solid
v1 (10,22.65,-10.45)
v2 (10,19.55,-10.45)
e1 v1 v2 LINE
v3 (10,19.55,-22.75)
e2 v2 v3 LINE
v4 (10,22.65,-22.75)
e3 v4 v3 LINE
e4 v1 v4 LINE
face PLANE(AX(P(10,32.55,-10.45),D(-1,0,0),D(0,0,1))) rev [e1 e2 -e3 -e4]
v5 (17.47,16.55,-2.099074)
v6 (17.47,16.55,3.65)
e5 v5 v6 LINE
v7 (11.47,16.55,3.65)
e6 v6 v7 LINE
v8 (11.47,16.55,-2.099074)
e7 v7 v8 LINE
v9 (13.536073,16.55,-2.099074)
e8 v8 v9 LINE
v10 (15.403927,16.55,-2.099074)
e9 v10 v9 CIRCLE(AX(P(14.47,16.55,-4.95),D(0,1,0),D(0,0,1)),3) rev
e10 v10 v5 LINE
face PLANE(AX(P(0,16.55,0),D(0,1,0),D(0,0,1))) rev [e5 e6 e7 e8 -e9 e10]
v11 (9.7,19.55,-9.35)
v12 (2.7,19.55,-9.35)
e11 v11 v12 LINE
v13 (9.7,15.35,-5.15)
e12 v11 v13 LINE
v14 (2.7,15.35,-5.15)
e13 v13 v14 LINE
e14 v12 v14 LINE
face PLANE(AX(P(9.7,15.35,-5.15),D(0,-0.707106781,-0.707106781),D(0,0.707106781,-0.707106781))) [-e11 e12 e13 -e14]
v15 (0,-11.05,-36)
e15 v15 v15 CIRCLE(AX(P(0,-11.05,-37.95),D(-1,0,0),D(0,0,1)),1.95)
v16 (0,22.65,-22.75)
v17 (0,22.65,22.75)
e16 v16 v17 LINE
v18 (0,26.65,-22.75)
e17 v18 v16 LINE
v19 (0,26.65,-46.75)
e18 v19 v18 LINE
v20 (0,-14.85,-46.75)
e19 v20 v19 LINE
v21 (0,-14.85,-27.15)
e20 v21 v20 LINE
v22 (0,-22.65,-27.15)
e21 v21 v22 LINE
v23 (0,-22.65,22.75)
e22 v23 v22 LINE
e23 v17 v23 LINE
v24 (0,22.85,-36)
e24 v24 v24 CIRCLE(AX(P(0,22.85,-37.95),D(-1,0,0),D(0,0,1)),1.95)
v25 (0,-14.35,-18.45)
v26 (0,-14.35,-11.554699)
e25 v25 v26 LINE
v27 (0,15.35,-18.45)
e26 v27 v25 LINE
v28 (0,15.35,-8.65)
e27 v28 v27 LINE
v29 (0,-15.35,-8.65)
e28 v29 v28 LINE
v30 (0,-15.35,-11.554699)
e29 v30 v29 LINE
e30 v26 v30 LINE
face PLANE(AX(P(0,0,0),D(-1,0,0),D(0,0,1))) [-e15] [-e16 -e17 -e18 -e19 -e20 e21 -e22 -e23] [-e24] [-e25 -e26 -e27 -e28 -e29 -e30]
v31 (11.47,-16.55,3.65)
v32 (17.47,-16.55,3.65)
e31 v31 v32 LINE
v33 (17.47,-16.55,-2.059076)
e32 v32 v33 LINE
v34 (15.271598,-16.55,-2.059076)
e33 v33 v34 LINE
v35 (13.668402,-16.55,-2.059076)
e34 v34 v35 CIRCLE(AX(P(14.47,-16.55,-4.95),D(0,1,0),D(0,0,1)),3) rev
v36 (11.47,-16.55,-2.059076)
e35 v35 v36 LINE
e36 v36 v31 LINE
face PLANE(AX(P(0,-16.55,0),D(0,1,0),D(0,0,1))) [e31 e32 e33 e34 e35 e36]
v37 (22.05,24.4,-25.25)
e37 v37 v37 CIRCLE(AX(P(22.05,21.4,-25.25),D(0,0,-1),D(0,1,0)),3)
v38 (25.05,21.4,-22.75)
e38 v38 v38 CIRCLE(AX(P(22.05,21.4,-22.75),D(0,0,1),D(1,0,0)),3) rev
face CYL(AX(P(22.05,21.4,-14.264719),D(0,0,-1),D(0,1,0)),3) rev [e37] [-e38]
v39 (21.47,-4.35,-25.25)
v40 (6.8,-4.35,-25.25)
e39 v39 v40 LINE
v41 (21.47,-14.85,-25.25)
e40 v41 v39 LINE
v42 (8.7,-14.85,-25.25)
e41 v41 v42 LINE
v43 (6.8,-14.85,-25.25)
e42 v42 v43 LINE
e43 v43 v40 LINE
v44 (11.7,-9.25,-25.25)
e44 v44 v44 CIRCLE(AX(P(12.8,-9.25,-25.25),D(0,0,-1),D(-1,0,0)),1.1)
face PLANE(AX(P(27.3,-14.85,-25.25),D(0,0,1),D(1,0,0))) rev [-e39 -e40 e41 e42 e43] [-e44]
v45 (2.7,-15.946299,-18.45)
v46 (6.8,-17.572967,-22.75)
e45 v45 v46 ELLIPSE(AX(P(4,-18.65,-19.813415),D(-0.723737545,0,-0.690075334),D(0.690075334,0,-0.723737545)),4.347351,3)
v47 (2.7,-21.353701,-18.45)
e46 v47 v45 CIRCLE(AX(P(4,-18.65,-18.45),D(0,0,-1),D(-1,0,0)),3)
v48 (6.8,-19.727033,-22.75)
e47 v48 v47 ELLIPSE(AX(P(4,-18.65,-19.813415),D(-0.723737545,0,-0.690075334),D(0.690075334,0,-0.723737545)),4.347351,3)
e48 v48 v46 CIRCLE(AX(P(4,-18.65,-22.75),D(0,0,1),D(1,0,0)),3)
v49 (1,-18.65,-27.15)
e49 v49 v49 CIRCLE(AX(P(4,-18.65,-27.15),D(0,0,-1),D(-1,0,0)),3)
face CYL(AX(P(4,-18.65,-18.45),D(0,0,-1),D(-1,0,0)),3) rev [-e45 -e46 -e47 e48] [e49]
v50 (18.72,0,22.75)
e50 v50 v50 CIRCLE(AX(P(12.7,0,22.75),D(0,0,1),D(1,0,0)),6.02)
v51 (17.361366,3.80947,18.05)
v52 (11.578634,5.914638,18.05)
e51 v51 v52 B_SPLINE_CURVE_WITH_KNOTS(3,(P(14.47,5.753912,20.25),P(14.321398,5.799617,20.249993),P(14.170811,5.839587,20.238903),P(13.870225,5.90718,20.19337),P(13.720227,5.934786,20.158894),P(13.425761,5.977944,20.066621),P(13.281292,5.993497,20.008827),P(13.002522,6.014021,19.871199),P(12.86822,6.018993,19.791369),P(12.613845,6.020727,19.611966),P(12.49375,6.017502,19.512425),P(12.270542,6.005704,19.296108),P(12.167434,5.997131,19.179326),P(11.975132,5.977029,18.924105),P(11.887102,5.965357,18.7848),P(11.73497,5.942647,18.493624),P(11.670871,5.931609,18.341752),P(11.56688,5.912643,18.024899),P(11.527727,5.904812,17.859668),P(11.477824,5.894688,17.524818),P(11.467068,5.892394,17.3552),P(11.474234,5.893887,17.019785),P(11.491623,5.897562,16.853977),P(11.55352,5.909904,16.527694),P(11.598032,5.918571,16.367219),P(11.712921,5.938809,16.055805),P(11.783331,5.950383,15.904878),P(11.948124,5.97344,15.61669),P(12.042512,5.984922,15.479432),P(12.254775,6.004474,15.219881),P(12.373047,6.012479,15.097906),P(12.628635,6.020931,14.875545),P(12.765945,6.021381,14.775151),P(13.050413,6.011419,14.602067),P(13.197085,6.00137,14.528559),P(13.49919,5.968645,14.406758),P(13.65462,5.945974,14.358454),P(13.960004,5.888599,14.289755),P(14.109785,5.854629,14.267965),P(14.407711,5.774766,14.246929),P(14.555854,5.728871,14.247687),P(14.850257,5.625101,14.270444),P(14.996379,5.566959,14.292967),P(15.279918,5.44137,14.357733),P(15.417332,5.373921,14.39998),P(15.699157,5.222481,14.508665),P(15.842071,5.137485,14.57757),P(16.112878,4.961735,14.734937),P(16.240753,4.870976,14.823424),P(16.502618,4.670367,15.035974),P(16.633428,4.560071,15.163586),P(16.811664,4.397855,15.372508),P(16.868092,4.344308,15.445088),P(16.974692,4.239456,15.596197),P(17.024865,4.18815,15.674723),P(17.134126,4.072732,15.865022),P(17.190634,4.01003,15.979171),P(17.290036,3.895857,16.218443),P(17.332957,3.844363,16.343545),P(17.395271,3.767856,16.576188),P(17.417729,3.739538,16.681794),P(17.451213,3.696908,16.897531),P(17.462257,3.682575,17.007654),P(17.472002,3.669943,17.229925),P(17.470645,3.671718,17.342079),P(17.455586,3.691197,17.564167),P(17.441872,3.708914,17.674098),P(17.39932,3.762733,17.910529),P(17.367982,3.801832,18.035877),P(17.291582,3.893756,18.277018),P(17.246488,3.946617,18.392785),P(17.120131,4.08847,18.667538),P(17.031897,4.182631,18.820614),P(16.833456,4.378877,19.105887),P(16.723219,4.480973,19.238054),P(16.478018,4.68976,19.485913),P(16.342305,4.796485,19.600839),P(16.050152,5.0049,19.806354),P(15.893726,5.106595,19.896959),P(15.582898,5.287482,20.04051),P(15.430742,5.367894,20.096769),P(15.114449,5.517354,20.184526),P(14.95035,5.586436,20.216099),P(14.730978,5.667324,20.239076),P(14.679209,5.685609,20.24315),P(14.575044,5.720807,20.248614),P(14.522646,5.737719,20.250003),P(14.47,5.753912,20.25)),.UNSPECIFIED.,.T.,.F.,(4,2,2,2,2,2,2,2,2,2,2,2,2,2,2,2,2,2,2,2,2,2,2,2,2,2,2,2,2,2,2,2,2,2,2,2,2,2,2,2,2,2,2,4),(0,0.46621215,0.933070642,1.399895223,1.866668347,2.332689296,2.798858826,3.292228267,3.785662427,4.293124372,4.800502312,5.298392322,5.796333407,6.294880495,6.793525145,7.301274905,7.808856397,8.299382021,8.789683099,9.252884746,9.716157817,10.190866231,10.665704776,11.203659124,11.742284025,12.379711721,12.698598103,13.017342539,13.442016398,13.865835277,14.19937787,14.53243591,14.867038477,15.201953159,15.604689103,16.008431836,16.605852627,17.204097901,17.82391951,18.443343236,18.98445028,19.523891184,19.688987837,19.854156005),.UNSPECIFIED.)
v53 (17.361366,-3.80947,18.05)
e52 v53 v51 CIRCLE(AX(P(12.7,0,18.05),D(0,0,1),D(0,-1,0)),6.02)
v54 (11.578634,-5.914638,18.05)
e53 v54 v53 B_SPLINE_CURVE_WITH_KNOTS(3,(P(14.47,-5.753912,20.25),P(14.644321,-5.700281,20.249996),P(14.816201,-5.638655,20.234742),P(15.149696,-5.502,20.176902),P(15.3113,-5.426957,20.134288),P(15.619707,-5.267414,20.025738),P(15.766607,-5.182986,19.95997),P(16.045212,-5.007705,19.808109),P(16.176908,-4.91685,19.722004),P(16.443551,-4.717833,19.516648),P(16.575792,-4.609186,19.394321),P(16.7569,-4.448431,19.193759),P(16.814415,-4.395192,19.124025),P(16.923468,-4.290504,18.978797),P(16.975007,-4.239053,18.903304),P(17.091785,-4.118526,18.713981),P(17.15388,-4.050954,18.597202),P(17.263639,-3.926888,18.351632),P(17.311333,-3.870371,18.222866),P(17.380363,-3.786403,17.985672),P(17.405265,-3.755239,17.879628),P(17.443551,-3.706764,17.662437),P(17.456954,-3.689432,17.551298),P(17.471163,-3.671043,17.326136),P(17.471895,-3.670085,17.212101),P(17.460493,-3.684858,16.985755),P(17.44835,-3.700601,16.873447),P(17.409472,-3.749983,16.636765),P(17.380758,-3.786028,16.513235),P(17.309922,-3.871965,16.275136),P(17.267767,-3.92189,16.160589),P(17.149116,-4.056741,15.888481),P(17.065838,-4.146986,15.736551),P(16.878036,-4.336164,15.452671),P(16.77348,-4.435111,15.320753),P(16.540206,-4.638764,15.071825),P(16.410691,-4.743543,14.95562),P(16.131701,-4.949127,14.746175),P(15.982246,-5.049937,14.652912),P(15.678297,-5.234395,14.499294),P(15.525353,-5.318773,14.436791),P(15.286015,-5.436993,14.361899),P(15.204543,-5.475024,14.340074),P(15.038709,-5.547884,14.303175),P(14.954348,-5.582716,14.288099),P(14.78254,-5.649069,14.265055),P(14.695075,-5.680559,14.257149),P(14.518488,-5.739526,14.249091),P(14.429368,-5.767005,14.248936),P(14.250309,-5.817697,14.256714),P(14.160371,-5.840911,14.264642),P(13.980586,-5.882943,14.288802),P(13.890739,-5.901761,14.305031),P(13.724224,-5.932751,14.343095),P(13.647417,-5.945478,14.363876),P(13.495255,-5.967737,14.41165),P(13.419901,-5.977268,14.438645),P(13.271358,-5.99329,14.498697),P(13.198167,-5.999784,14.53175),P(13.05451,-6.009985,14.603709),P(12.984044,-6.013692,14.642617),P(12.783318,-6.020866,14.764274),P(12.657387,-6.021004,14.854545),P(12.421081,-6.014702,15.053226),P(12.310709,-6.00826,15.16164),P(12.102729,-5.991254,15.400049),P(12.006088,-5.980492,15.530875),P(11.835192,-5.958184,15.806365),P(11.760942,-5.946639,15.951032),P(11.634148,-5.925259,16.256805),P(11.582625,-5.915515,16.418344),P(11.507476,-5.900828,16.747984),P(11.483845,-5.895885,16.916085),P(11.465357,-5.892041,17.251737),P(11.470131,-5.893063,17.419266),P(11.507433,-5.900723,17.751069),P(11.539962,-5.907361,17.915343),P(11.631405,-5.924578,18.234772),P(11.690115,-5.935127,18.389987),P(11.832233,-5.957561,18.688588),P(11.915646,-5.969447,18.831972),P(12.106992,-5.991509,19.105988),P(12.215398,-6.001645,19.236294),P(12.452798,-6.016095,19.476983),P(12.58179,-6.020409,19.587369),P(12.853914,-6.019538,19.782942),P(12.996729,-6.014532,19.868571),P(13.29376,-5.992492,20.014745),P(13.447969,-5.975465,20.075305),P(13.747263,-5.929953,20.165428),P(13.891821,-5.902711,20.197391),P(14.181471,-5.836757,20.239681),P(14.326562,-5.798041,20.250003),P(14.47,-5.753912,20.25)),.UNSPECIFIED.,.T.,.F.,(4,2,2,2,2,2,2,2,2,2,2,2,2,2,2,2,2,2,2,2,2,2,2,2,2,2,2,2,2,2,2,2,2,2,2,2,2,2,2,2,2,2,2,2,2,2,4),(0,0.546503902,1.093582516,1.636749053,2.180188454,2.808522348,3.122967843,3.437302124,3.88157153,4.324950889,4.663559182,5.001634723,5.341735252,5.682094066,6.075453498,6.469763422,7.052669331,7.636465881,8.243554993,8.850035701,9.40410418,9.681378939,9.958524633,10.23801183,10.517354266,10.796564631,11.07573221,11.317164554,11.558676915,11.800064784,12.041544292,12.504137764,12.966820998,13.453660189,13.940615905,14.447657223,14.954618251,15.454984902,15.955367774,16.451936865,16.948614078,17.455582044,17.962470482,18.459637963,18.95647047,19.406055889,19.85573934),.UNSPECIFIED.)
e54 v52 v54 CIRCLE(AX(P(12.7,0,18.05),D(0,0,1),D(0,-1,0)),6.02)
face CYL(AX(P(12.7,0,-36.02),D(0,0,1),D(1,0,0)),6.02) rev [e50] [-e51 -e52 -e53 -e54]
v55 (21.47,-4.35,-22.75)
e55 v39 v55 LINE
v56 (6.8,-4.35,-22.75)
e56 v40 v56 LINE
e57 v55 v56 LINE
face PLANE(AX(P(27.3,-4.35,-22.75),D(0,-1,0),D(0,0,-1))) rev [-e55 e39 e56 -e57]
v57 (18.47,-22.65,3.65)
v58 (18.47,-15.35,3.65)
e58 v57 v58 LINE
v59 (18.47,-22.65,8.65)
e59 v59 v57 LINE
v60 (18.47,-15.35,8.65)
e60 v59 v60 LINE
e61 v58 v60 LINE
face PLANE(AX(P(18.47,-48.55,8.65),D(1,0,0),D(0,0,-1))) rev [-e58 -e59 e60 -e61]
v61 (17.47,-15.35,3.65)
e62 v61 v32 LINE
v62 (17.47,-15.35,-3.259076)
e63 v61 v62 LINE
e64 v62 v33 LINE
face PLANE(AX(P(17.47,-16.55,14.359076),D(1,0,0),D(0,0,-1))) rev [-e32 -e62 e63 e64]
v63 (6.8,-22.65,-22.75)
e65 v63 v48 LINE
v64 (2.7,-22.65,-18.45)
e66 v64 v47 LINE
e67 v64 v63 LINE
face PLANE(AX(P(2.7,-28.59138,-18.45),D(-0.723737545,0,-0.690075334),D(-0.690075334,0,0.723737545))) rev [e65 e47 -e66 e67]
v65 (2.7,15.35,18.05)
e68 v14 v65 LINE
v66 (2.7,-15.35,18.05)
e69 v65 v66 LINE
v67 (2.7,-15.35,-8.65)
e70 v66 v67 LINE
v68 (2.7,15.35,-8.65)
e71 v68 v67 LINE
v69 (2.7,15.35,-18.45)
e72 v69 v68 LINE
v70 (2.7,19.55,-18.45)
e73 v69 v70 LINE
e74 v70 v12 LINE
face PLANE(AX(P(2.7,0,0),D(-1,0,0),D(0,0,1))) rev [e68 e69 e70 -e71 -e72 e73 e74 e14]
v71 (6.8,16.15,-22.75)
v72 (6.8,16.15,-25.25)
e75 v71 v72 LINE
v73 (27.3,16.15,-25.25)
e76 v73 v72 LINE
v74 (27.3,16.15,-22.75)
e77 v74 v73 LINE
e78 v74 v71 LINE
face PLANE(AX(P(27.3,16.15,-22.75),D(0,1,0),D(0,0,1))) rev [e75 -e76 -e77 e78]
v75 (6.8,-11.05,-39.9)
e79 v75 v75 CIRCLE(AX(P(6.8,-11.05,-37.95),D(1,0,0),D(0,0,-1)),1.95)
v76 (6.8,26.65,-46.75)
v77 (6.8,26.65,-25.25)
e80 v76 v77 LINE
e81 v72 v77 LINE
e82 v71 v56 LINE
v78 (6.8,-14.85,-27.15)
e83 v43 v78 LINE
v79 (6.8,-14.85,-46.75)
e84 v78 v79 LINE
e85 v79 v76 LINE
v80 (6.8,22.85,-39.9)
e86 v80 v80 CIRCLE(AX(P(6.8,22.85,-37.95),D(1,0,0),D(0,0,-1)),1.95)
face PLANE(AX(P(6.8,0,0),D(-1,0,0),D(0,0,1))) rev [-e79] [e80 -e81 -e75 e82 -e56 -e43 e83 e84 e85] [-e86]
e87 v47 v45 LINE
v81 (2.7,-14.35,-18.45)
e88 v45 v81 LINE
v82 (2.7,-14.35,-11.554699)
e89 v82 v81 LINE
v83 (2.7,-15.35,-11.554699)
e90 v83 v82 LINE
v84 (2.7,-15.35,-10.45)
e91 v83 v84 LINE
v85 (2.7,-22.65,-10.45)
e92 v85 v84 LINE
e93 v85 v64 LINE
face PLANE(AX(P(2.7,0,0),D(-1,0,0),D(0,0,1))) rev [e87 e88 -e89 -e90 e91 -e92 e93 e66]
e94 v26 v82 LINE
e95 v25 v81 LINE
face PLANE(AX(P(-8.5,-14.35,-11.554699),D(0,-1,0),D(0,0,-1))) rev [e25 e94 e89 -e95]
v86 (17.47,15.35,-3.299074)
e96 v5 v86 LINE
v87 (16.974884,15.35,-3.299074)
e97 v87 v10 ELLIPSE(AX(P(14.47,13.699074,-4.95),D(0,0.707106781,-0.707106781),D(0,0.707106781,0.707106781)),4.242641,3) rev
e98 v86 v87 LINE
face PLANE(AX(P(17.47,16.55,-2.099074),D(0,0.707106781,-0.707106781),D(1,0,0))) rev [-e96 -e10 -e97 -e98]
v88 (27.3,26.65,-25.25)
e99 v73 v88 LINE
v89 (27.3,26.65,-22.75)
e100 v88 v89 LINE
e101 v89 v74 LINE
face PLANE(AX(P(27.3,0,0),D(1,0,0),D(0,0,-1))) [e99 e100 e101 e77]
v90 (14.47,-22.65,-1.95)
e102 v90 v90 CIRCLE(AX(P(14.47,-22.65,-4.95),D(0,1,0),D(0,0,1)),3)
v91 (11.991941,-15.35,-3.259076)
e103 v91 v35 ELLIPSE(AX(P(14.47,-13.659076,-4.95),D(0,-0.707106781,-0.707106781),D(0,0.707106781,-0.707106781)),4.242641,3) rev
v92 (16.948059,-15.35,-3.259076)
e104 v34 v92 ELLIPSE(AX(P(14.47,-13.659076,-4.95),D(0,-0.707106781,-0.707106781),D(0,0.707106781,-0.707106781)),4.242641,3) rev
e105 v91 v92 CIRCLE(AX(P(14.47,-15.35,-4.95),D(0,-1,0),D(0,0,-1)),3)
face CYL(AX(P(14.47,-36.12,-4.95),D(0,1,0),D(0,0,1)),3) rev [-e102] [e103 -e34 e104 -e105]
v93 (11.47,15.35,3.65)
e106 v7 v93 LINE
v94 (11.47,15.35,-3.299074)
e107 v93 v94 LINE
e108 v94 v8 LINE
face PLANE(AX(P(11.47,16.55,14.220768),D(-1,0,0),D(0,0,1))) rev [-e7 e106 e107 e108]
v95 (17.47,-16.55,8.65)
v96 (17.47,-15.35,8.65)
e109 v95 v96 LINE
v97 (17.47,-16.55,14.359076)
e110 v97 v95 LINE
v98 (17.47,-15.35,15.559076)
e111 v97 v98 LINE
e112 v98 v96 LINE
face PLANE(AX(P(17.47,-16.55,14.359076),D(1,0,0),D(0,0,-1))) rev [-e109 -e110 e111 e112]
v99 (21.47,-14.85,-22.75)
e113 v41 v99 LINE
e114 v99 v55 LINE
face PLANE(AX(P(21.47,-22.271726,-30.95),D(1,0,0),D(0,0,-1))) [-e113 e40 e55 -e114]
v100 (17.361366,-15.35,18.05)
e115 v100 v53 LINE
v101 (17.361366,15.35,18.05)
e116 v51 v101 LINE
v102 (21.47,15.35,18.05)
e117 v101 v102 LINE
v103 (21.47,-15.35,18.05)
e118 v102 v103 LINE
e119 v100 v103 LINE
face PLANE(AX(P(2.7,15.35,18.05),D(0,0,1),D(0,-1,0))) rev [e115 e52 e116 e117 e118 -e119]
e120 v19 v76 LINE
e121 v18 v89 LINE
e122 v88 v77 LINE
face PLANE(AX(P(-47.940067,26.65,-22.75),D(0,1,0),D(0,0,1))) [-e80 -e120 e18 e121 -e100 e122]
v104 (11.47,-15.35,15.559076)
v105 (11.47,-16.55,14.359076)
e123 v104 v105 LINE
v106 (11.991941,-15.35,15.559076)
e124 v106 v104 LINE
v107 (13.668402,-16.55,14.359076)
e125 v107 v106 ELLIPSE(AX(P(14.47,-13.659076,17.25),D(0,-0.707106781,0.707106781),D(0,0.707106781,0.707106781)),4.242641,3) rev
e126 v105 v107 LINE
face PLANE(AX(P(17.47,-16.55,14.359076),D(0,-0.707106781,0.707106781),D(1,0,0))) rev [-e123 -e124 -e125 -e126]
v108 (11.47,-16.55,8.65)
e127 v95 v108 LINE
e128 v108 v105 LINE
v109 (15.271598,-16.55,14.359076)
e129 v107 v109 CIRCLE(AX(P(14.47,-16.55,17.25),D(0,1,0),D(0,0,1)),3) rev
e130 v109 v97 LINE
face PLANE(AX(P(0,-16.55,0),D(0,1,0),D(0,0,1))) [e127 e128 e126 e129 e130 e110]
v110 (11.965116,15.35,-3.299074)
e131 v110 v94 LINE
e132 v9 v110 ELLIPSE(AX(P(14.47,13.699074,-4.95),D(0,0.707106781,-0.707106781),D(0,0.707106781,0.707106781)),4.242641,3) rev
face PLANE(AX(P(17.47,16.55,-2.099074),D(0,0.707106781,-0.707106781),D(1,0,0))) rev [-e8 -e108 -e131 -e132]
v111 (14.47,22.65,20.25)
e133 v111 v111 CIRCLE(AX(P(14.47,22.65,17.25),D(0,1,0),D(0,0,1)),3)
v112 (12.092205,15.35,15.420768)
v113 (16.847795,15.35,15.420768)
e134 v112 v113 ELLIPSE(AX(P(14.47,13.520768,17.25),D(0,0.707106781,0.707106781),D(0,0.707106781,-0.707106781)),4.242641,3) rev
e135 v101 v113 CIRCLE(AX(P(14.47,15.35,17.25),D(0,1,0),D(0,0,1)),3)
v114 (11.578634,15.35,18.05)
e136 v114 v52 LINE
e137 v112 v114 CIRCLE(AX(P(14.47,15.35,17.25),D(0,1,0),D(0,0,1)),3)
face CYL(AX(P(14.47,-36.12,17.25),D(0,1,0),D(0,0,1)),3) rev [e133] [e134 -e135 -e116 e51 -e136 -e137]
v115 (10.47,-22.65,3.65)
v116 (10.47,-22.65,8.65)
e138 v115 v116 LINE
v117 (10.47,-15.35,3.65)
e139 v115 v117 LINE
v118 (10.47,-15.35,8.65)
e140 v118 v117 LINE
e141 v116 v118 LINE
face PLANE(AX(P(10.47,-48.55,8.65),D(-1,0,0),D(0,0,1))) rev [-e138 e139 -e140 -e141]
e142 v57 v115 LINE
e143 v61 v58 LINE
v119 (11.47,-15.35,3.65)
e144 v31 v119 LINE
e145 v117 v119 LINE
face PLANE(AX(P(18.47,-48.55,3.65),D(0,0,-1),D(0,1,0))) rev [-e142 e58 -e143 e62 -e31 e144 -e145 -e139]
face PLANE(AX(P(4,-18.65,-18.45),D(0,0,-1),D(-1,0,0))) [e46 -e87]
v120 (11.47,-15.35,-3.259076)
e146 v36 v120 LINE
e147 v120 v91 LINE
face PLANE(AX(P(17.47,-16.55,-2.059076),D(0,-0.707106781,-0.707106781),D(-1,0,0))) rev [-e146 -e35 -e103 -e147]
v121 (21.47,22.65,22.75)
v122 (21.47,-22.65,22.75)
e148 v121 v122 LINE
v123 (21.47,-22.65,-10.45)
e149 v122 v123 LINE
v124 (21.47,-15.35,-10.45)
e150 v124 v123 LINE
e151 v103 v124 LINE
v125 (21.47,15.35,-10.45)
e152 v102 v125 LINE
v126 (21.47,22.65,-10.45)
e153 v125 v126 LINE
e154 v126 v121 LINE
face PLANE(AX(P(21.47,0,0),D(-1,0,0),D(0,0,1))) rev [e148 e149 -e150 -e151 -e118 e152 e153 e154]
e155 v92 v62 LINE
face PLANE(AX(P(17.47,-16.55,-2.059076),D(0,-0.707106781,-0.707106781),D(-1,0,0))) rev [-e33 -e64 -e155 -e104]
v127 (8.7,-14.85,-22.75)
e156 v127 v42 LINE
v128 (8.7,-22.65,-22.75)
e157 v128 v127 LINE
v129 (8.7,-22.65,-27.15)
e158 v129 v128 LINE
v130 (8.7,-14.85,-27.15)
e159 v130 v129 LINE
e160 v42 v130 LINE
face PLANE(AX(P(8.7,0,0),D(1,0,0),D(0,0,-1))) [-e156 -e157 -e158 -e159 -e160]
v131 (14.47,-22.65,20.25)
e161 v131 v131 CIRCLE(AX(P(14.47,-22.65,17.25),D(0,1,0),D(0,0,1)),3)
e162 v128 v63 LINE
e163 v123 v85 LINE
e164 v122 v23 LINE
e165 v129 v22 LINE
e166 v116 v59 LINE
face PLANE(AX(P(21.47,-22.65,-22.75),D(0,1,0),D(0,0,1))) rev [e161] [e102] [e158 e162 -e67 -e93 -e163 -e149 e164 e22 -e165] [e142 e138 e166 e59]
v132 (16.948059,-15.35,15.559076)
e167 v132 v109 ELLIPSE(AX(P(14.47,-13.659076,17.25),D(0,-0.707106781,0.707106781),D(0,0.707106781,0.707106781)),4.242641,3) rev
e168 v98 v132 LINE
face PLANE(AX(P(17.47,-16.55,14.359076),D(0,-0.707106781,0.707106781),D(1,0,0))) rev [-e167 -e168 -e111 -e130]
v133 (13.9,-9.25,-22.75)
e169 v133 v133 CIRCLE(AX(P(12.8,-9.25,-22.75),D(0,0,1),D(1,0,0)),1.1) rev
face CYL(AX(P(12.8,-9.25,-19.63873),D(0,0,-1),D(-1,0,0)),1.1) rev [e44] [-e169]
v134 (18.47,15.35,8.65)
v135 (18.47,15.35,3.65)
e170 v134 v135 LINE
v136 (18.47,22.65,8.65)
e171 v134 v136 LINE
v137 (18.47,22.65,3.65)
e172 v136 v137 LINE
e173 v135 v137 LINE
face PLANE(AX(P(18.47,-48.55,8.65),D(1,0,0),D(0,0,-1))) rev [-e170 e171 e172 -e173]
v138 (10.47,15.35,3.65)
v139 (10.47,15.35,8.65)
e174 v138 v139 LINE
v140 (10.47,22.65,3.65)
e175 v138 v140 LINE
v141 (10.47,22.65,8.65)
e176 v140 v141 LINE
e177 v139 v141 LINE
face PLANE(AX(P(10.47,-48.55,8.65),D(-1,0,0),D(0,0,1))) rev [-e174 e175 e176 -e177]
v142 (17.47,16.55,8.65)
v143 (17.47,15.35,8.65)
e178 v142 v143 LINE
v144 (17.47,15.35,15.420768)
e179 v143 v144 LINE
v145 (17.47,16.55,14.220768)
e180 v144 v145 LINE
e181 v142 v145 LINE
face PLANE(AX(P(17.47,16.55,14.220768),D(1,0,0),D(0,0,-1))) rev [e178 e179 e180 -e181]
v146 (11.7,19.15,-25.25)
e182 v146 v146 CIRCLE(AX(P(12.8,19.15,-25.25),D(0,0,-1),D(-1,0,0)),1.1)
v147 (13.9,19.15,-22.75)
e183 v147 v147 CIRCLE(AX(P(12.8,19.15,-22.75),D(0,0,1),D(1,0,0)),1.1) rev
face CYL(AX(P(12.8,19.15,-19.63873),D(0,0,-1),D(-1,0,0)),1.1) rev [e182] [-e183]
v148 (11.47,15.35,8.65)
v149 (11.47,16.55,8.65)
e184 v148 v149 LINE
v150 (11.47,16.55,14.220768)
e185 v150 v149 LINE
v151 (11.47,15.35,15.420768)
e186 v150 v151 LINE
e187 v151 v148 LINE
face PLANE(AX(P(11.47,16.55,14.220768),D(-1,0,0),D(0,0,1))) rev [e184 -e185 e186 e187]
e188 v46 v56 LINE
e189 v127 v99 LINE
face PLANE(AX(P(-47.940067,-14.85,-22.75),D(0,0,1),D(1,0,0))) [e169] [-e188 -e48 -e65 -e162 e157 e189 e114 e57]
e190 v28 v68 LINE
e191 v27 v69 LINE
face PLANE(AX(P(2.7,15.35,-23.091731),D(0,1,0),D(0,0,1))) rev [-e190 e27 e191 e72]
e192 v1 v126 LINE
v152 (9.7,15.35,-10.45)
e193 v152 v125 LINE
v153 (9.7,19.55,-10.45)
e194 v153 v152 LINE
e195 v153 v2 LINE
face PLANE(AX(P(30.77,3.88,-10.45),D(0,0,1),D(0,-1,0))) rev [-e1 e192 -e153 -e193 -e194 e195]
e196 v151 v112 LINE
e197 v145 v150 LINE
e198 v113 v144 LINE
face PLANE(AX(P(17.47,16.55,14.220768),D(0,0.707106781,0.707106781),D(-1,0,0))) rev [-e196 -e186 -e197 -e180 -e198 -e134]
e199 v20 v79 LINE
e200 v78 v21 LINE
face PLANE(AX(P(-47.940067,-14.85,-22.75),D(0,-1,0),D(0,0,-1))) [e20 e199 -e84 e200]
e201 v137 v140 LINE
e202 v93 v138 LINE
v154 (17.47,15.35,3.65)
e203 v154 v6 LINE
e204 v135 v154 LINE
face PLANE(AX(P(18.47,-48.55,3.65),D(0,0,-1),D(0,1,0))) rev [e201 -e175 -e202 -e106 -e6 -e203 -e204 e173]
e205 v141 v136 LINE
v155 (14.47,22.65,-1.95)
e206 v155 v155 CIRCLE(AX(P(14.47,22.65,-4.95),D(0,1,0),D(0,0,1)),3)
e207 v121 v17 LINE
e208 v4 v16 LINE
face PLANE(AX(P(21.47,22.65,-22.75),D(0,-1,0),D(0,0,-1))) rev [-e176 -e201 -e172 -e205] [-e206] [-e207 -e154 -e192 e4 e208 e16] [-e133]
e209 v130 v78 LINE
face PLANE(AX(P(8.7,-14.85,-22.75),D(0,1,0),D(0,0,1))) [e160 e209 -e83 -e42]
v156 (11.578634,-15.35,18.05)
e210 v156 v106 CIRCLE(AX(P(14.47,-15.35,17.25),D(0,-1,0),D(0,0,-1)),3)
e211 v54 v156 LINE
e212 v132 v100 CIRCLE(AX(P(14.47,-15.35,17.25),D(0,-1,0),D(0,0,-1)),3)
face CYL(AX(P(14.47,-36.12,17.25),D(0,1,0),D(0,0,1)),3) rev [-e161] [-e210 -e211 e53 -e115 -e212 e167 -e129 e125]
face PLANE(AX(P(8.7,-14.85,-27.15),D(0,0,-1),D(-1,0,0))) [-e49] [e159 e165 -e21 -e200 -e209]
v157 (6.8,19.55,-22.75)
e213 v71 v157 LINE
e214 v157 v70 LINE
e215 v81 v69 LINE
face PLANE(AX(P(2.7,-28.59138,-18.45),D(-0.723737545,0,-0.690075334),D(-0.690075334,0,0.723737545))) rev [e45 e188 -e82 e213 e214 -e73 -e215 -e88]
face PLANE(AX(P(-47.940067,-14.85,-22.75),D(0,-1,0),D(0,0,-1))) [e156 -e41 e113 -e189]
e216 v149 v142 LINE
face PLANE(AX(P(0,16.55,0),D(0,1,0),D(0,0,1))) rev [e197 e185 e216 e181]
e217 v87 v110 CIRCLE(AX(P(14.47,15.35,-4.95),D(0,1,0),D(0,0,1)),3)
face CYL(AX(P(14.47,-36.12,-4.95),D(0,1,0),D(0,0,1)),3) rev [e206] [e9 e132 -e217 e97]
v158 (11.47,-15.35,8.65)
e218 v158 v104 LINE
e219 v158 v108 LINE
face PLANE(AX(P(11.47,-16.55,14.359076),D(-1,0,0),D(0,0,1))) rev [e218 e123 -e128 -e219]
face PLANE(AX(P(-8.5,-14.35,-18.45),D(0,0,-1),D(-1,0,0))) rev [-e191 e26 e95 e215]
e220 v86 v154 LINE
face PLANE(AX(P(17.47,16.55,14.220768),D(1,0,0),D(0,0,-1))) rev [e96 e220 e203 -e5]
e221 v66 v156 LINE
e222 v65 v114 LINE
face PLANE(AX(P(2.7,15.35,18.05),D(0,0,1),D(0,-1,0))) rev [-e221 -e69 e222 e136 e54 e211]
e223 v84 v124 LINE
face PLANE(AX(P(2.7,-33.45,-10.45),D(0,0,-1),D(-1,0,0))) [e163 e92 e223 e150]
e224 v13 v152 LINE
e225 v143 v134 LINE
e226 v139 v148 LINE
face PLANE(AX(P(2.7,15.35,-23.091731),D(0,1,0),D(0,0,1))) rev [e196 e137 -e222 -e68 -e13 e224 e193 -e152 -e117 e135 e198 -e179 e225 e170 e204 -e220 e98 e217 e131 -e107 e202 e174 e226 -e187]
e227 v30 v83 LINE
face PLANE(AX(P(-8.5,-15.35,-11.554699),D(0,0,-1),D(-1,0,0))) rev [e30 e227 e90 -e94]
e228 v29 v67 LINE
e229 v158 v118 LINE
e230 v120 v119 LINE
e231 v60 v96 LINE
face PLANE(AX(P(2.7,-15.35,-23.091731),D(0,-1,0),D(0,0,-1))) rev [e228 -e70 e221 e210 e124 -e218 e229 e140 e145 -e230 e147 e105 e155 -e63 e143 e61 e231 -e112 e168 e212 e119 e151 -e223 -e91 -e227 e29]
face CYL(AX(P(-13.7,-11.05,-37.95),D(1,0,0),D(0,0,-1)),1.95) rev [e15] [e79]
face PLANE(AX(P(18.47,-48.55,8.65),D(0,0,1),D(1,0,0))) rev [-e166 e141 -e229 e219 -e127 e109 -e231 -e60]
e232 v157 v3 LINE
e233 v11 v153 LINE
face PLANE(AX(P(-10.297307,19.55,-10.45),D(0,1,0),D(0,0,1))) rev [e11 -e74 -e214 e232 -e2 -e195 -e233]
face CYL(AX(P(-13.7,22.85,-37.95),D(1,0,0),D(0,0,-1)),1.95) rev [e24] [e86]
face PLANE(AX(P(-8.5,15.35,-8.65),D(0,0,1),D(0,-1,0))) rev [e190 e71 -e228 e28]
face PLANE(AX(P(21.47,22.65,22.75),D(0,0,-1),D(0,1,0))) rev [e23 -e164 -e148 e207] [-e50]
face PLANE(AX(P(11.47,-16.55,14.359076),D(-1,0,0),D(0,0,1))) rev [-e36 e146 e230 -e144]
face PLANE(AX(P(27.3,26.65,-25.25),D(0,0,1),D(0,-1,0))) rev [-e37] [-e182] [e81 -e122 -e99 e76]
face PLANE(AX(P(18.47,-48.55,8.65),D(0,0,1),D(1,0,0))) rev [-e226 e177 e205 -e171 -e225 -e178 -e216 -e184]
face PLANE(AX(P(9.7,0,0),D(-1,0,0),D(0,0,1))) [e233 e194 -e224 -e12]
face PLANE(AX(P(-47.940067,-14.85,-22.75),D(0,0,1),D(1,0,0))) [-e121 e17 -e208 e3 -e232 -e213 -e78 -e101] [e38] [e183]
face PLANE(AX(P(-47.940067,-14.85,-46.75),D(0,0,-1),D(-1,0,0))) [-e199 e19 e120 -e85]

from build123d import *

# Parameters (mm, degrees)
CROQUIS4_W              = 45.5
CROQUIS4_H              = 45.3
SALIENTE_EXTRUIR3_DEPTH = 21.47
CROQUIS5_W              = 41.141731218
CROQUIS5_H              = 30.7
CORTAR_EXTRUIR2_DEPTH   = 18.77
CROQUIS6_W              = 18.6
CROQUIS6_H              = 24.6
CORTAR_EXTRUIR3_DEPTH   = 18.77
CROQUIS7_R              = 3
CORTAR_EXTRUIR4_DEPTH   = 58.77
CROQUIS8_R              = 6.02
CORTAR_EXTRUIR5_DEPTH   = 58.77
CROQUIS9_W              = 6
CROQUIS9_H              = 16.319841708
CORTAR_EXTRUIR7_DEPTH   = 1.2
CHAFL_N1_SIZE           = 1.2
CROQUIS10_W             = 8
CROQUIS10_H             = 5
CORTAR_EXTRUIR8_DEPTH   = 71.2
CROQUIS11_W             = 6
CROQUIS11_H             = 16.418152186
CORTAR_EXTRUIR9_DEPTH   = 1.2
CHAFL_N2_SIZE           = 1.2
CORTAR_EXTRUIR12_DEPTH  = 11.2
CORTAR_EXTRUIR14_DEPTH  = 7
CROQUIS15_W             = 12.3
CROQUIS15_H             = 4.2
CORTAR_EXTRUIR15_DEPTH  = 9.47
CROQUIS16_W             = 7
CROQUIS16_H             = 5
CORTAR_EXTRUIR17_DEPTH  = 0.3
CROQUIS17_W             = 7
CROQUIS17_H             = 0.8
SALIENTE_EXTRUIR4_DEPTH = 3
CROQUIS18_W             = 21.819351721
CROQUIS18_H             = 12.3
CORTAR_EXTRUIR18_DEPTH  = 53
SALIENTE_EXTRUIR5_START = -2.7
CROQUIS19_W             = 24
CROQUIS19_H             = 41.5
SALIENTE_EXTRUIR5_DEPTH = 6.8
CROQUIS21_W             = 2.5
CROQUIS21_H             = 10.5
SALIENTE_EXTRUIR6_DEPTH = 20.5
CROQUIS22_R             = 1.95
CORTAR_EXTRUIR19_DEPTH  = 20.5
CROQUIS23_W             = 9.795322327
CROQUIS23_H             = 20.802243728
CORTAR_EXTRUIR20_DEPTH  = 20.5
CROQUIS24_R             = 1.1
CORTAR_EXTRUIR22_DEPTH  = 2.5
CROQUIS25_W             = 2.17
CROQUIS25_H             = 12.3
CORTAR_EXTRUIR23_DEPTH  = 13
CROQUIS26_R             = 3
CORTAR_EXTRUIR24_DEPTH  = 2.5
SALIENTE_EXTRUIR7_REACH = 70.642
CROQUIS31_W             = 4.4
CROQUIS31_H             = 7.8
SALIENTE_EXTRUIR8_DEPTH = 8.7
CROQUIS32_R             = 3
CORTAR_EXTRUIR25_DEPTH  = 8.7


# Some blends are built 0.0001 mm under size
with BuildPart() as part:
    # Croquis4 → Saliente-Extruir3 (new body)
    with BuildSketch(Plane(origin=(0, 0, 0), x_dir=(0, 0, -1), z_dir=(1, 0, 0))):
        Rectangle(CROQUIS4_W, CROQUIS4_H)
    extrude(amount=SALIENTE_EXTRUIR3_DEPTH)

    # Croquis5 → Cortar-Extruir2 (cut)
    with BuildSketch(Plane(origin=(21.47, 0, 0), x_dir=(0, 0, -1), z_dir=(1, 0, 0))):
        with Locations((2.520865609, 0)):
            Rectangle(CROQUIS5_W, CROQUIS5_H)
    extrude(amount=-CORTAR_EXTRUIR2_DEPTH, mode=Mode.SUBTRACT)

    # Croquis6 → Cortar-Extruir3 (cut)
    with BuildSketch(Plane(origin=(0, 22.65, 0), x_dir=(1, 0, 0), z_dir=(0, 1, 0))):
        with Locations((21.47, 22.75)):
            Rectangle(CROQUIS6_W, CROQUIS6_H)
    extrude(amount=-CORTAR_EXTRUIR3_DEPTH, mode=Mode.SUBTRACT)

    # Croquis7 → Cortar-Extruir4 (cut)
    with BuildSketch(Plane(origin=(0, 22.65, 0), x_dir=(1, 0, 0), z_dir=(0, 1, 0))):
        with Locations(Location((14.47, -17.25, 0), (0, 0, 270))):
            Circle(CROQUIS7_R)
        with Locations(Location((14.47, 4.95, 0), (0, 0, 270))):
            Circle(CROQUIS7_R)
    extrude(amount=-CORTAR_EXTRUIR4_DEPTH, mode=Mode.SUBTRACT)

    # Croquis8 → Cortar-Extruir5 (cut)
    with BuildSketch(Plane.XY.offset(22.75)):
        with Locations((12.7, 0)):
            Circle(CROQUIS8_R)
    extrude(amount=-CORTAR_EXTRUIR5_DEPTH, mode=Mode.SUBTRACT)

    # Croquis9 → Cortar-Extruir7 (cut)
    with BuildSketch(Plane.XZ.offset(-15.35)):
        with Locations((14.47, 6.060847086)):
            Rectangle(CROQUIS9_W, CROQUIS9_H)
    extrude(amount=-CORTAR_EXTRUIR7_DEPTH, mode=Mode.SUBTRACT)

    # Chaflán1
    # the kernel refuses this chamfer: 1.2 mm, written as the material it takes off along each edge
    with BuildSketch(Plane(origin=(12.317907402, 15.35, -2.099073768), x_dir=(0, -0.027495876610584495, -0.9996219169112968), z_dir=(1, 0, 0)), Plane(origin=(11.47, 15.35, -2.099073768), x_dir=(0, -0.027495876610584533, -0.9996219169112968), z_dir=(1, 0, 0))) as chafl_n1_piece_1:
        Polygon((CHAFL_N1_SIZE * 0.999621916911, CHAFL_N1_SIZE * 0.0274958766106), (-CHAFL_N1_SIZE * 0.0274958766106, CHAFL_N1_SIZE * 0.999621916911), (0, 0), align=None)
    extrude(amount=5.152092598, mode=Mode.SUBTRACT)
    with BuildSketch(Plane(origin=(17.47, 15.35, 14.22076794), x_dir=(0, -0.027495876610585984, 0.9996219169112968), z_dir=(-1, 0, 0))) as chafl_n1_piece_2_section:
        Polygon((CHAFL_N1_SIZE * 0.999621916911, CHAFL_N1_SIZE * 0.0274958766106), (-CHAFL_N1_SIZE * 0.0274958766106, CHAFL_N1_SIZE * 0.999621916911), (0, 0), align=None)
    chafl_n1_piece_2 = extrude(amount=6, mode=Mode.PRIVATE)
    chafl_n1_piece_2 = split(chafl_n1_piece_2, bisect_by=Plane(origin=(14.47, 16.55, 14.617252925), z_dir=(0, -1, 0)), keep=Keep.TOP, mode=Mode.PRIVATE)
    add(chafl_n1_piece_2, mode=Mode.SUBTRACT)

    # Croquis10 → Cortar-Extruir8 (cut)
    with BuildSketch(Plane(origin=(0, 22.65, 0), x_dir=(1, 0, 0), z_dir=(0, 1, 0))):
        with Locations((14.47, -6.15)):
            Rectangle(CROQUIS10_W, CROQUIS10_H)
    extrude(amount=-CORTAR_EXTRUIR8_DEPTH, mode=Mode.SUBTRACT)

    # Croquis11 → Cortar-Extruir9 (cut)
    with BuildSketch(Plane(origin=(0, -15.35, 0), x_dir=(1, 0, 0), z_dir=(0, 1, 0))):
        with Locations((14.47, -6.15)):
            Rectangle(CROQUIS11_W, CROQUIS11_H)
    extrude(amount=-CORTAR_EXTRUIR9_DEPTH, mode=Mode.SUBTRACT)

    # Chaflán2
    chafl_n2_edges = [part.edges().sort_by_distance(p)[0] for p in [
        (12.569201122, -15.35, -2.059076093),
        (16.370798878, -15.35, -2.059076093),
        (12.569201122, -15.35, 14.359076093),
        (16.370798878, -15.35, 14.359076093),
    ]]
    chamfer(chafl_n2_edges, length=CHAFL_N2_SIZE - 0.0001)  # a hair under: the kernel refuses the full size

    # Croquis12 → Cortar-Extruir12 (cut)
    with BuildSketch(Plane(origin=(2.7, 0, 0), x_dir=(0, 0, -1), z_dir=(1, 0, 0))):
        Polygon((8.65, 15.35), (8.65, -15.35), (11.55469898, -15.35), (11.55469898, -14.35), (18.45, -14.35), (18.45, 15.35), align=None)
    extrude(amount=-CORTAR_EXTRUIR12_DEPTH, mode=Mode.SUBTRACT)

    # Croquis14 → Cortar-Extruir14 (cut)
    with BuildSketch(Plane(origin=(2.7, 0, 0), x_dir=(0, 0, -1), z_dir=(1, 0, 0))):
        Polygon((10.15, 15.35), (5.15, 15.35), (10.15, 20.35), align=None)
    extrude(amount=CORTAR_EXTRUIR14_DEPTH, mode=Mode.SUBTRACT)

    # Croquis15 → Cortar-Extruir15 (cut)
    with BuildSketch(Plane(origin=(12.17, 0, 0), x_dir=(0, 0, -1), z_dir=(1, 0, 0))):
        with Locations((16.6, 17.45)):
            Rectangle(CROQUIS15_W, CROQUIS15_H)
    extrude(amount=-CORTAR_EXTRUIR15_DEPTH, mode=Mode.SUBTRACT)

    # Croquis16 → Cortar-Extruir17 (cut)
    with BuildSketch(Plane.XY.offset(-10.15)):
        with Locations((6.2, 17.85)):
            Rectangle(CROQUIS16_W, CROQUIS16_H)
    extrude(amount=-CORTAR_EXTRUIR17_DEPTH, mode=Mode.SUBTRACT)

    # Croquis17 → Saliente-Extruir4 (add)
    with BuildSketch(Plane(origin=(0, 0, -10.45), x_dir=(-1, 0, 0), z_dir=(0, 0, -1))):
        with Locations((-6.2, 19.95)):
            Rectangle(CROQUIS17_W, CROQUIS17_H)
    extrude(amount=-SALIENTE_EXTRUIR4_DEPTH)

    # Croquis18 → Cortar-Extruir18 (cut)
    with BuildSketch(Plane.XZ.offset(-19.55)):
        with Locations((13.609675861, -16.6)):
            Rectangle(CROQUIS18_W, CROQUIS18_H)
    extrude(amount=CORTAR_EXTRUIR18_DEPTH, mode=Mode.SUBTRACT)

    # Croquis19 → Saliente-Extruir5 (add)
    with BuildSketch(Plane(origin=(2.7, 0, 0), x_dir=(0, 0, -1), z_dir=(1, 0, 0)).offset(SALIENTE_EXTRUIR5_START)):
        with Locations((34.75, 5.9)):
            Rectangle(CROQUIS19_W, CROQUIS19_H)
    extrude(amount=SALIENTE_EXTRUIR5_DEPTH)

    # Croquis21 → Saliente-Extruir6 (add)
    with BuildSketch(Plane(origin=(6.8, 0, 0), x_dir=(0, 0, -1), z_dir=(1, 0, 0))):
        with Locations((24, 21.4)):
            Rectangle(CROQUIS21_W, CROQUIS21_H)
        with Locations((24, -9.6)):
            Rectangle(CROQUIS21_W, CROQUIS21_H)
    extrude(amount=SALIENTE_EXTRUIR6_DEPTH)

    # Croquis22 → Cortar-Extruir19 (cut)
    with BuildSketch(Plane(origin=(6.8, 0, 0), x_dir=(0, 0, -1), z_dir=(1, 0, 0))):
        with Locations((37.95, 22.85)):
            Circle(CROQUIS22_R)
        with Locations((37.95, -11.05)):
            Circle(CROQUIS22_R)
    extrude(amount=-CORTAR_EXTRUIR19_DEPTH, mode=Mode.SUBTRACT)

    # Croquis23 → Cortar-Extruir20 (cut)
    with BuildSketch(Plane(origin=(0, 0, -10.45), x_dir=(-1, 0, 0), z_dir=(0, 0, -1))):
        with Locations((-26.367661164, -11.870604275)):
            Rectangle(CROQUIS23_W, CROQUIS23_H)
    extrude(amount=CORTAR_EXTRUIR20_DEPTH, mode=Mode.SUBTRACT)

    # Croquis24 → Cortar-Extruir22 (cut)
    with BuildSketch(Plane(origin=(0, 0, -25.25), x_dir=(-1, 0, 0), z_dir=(0, 0, -1))):
        with Locations((-12.8, -9.25)):
            Circle(CROQUIS24_R)
        with Locations((-12.8, 19.15)):
            Circle(CROQUIS24_R)
    extrude(amount=-CORTAR_EXTRUIR22_DEPTH, mode=Mode.SUBTRACT)

    # Croquis25 → Cortar-Extruir23 (cut)
    with BuildSketch(Plane.XZ.offset(-19.55)):
        with Locations((11.085, -16.6)):
            Rectangle(CROQUIS25_W, CROQUIS25_H)
    extrude(amount=-CORTAR_EXTRUIR23_DEPTH, mode=Mode.SUBTRACT)

    # Croquis26 → Cortar-Extruir24 (cut)
    with BuildSketch(Plane(origin=(0, 0, -25.25), x_dir=(-1, 0, 0), z_dir=(0, 0, -1))):
        with Locations(Location((-22.05, 21.4, 0), (0, 0, 90))):
            Circle(CROQUIS26_R)
    extrude(amount=-CORTAR_EXTRUIR24_DEPTH, mode=Mode.SUBTRACT)

    # Saliente-Extruir7: up to this face of the body (flat: up to its plane)
    saliente_extruir7_end = Plane(part.part.faces().sort_by_distance((9.699863726, -22.65, 4.986693104))[0])
    # Croquis30 → Saliente-Extruir7 (add, up to the picked face)
    with BuildSketch(Plane.XZ.offset(-19.55), mode=Mode.PRIVATE) as saliente_extruir7_sk1:
        Polygon((2.7, -18.45), (6.8, -22.75), (2.7, -22.75), align=None)
    saliente_extruir7_tool1 = split(extrude(saliente_extruir7_sk1.sketch, amount=SALIENTE_EXTRUIR7_REACH, mode=Mode.PRIVATE), bisect_by=saliente_extruir7_end, keep=Keep.BOTH, mode=Mode.PRIVATE)
    add(saliente_extruir7_tool1.solids().sort_by(Axis((4.066667, 19.55, -21.316667), (0, -1, 0)))[0])

    # Croquis31 → Saliente-Extruir8 (add)
    with BuildSketch(Plane.ZY):
        with Locations((-24.95, -18.75)):
            Rectangle(CROQUIS31_W, CROQUIS31_H)
    extrude(amount=-SALIENTE_EXTRUIR8_DEPTH)

    # Croquis32 → Cortar-Extruir25 (cut)
    with BuildSketch(Plane(origin=(0, 0, -27.15), x_dir=(-1, 0, 0), z_dir=(0, 0, -1))):
        with Locations((-4, -18.65)):
            Circle(CROQUIS32_R)
    extrude(amount=-CORTAR_EXTRUIR25_DEPTH, mode=Mode.SUBTRACT)


solid = part.part
